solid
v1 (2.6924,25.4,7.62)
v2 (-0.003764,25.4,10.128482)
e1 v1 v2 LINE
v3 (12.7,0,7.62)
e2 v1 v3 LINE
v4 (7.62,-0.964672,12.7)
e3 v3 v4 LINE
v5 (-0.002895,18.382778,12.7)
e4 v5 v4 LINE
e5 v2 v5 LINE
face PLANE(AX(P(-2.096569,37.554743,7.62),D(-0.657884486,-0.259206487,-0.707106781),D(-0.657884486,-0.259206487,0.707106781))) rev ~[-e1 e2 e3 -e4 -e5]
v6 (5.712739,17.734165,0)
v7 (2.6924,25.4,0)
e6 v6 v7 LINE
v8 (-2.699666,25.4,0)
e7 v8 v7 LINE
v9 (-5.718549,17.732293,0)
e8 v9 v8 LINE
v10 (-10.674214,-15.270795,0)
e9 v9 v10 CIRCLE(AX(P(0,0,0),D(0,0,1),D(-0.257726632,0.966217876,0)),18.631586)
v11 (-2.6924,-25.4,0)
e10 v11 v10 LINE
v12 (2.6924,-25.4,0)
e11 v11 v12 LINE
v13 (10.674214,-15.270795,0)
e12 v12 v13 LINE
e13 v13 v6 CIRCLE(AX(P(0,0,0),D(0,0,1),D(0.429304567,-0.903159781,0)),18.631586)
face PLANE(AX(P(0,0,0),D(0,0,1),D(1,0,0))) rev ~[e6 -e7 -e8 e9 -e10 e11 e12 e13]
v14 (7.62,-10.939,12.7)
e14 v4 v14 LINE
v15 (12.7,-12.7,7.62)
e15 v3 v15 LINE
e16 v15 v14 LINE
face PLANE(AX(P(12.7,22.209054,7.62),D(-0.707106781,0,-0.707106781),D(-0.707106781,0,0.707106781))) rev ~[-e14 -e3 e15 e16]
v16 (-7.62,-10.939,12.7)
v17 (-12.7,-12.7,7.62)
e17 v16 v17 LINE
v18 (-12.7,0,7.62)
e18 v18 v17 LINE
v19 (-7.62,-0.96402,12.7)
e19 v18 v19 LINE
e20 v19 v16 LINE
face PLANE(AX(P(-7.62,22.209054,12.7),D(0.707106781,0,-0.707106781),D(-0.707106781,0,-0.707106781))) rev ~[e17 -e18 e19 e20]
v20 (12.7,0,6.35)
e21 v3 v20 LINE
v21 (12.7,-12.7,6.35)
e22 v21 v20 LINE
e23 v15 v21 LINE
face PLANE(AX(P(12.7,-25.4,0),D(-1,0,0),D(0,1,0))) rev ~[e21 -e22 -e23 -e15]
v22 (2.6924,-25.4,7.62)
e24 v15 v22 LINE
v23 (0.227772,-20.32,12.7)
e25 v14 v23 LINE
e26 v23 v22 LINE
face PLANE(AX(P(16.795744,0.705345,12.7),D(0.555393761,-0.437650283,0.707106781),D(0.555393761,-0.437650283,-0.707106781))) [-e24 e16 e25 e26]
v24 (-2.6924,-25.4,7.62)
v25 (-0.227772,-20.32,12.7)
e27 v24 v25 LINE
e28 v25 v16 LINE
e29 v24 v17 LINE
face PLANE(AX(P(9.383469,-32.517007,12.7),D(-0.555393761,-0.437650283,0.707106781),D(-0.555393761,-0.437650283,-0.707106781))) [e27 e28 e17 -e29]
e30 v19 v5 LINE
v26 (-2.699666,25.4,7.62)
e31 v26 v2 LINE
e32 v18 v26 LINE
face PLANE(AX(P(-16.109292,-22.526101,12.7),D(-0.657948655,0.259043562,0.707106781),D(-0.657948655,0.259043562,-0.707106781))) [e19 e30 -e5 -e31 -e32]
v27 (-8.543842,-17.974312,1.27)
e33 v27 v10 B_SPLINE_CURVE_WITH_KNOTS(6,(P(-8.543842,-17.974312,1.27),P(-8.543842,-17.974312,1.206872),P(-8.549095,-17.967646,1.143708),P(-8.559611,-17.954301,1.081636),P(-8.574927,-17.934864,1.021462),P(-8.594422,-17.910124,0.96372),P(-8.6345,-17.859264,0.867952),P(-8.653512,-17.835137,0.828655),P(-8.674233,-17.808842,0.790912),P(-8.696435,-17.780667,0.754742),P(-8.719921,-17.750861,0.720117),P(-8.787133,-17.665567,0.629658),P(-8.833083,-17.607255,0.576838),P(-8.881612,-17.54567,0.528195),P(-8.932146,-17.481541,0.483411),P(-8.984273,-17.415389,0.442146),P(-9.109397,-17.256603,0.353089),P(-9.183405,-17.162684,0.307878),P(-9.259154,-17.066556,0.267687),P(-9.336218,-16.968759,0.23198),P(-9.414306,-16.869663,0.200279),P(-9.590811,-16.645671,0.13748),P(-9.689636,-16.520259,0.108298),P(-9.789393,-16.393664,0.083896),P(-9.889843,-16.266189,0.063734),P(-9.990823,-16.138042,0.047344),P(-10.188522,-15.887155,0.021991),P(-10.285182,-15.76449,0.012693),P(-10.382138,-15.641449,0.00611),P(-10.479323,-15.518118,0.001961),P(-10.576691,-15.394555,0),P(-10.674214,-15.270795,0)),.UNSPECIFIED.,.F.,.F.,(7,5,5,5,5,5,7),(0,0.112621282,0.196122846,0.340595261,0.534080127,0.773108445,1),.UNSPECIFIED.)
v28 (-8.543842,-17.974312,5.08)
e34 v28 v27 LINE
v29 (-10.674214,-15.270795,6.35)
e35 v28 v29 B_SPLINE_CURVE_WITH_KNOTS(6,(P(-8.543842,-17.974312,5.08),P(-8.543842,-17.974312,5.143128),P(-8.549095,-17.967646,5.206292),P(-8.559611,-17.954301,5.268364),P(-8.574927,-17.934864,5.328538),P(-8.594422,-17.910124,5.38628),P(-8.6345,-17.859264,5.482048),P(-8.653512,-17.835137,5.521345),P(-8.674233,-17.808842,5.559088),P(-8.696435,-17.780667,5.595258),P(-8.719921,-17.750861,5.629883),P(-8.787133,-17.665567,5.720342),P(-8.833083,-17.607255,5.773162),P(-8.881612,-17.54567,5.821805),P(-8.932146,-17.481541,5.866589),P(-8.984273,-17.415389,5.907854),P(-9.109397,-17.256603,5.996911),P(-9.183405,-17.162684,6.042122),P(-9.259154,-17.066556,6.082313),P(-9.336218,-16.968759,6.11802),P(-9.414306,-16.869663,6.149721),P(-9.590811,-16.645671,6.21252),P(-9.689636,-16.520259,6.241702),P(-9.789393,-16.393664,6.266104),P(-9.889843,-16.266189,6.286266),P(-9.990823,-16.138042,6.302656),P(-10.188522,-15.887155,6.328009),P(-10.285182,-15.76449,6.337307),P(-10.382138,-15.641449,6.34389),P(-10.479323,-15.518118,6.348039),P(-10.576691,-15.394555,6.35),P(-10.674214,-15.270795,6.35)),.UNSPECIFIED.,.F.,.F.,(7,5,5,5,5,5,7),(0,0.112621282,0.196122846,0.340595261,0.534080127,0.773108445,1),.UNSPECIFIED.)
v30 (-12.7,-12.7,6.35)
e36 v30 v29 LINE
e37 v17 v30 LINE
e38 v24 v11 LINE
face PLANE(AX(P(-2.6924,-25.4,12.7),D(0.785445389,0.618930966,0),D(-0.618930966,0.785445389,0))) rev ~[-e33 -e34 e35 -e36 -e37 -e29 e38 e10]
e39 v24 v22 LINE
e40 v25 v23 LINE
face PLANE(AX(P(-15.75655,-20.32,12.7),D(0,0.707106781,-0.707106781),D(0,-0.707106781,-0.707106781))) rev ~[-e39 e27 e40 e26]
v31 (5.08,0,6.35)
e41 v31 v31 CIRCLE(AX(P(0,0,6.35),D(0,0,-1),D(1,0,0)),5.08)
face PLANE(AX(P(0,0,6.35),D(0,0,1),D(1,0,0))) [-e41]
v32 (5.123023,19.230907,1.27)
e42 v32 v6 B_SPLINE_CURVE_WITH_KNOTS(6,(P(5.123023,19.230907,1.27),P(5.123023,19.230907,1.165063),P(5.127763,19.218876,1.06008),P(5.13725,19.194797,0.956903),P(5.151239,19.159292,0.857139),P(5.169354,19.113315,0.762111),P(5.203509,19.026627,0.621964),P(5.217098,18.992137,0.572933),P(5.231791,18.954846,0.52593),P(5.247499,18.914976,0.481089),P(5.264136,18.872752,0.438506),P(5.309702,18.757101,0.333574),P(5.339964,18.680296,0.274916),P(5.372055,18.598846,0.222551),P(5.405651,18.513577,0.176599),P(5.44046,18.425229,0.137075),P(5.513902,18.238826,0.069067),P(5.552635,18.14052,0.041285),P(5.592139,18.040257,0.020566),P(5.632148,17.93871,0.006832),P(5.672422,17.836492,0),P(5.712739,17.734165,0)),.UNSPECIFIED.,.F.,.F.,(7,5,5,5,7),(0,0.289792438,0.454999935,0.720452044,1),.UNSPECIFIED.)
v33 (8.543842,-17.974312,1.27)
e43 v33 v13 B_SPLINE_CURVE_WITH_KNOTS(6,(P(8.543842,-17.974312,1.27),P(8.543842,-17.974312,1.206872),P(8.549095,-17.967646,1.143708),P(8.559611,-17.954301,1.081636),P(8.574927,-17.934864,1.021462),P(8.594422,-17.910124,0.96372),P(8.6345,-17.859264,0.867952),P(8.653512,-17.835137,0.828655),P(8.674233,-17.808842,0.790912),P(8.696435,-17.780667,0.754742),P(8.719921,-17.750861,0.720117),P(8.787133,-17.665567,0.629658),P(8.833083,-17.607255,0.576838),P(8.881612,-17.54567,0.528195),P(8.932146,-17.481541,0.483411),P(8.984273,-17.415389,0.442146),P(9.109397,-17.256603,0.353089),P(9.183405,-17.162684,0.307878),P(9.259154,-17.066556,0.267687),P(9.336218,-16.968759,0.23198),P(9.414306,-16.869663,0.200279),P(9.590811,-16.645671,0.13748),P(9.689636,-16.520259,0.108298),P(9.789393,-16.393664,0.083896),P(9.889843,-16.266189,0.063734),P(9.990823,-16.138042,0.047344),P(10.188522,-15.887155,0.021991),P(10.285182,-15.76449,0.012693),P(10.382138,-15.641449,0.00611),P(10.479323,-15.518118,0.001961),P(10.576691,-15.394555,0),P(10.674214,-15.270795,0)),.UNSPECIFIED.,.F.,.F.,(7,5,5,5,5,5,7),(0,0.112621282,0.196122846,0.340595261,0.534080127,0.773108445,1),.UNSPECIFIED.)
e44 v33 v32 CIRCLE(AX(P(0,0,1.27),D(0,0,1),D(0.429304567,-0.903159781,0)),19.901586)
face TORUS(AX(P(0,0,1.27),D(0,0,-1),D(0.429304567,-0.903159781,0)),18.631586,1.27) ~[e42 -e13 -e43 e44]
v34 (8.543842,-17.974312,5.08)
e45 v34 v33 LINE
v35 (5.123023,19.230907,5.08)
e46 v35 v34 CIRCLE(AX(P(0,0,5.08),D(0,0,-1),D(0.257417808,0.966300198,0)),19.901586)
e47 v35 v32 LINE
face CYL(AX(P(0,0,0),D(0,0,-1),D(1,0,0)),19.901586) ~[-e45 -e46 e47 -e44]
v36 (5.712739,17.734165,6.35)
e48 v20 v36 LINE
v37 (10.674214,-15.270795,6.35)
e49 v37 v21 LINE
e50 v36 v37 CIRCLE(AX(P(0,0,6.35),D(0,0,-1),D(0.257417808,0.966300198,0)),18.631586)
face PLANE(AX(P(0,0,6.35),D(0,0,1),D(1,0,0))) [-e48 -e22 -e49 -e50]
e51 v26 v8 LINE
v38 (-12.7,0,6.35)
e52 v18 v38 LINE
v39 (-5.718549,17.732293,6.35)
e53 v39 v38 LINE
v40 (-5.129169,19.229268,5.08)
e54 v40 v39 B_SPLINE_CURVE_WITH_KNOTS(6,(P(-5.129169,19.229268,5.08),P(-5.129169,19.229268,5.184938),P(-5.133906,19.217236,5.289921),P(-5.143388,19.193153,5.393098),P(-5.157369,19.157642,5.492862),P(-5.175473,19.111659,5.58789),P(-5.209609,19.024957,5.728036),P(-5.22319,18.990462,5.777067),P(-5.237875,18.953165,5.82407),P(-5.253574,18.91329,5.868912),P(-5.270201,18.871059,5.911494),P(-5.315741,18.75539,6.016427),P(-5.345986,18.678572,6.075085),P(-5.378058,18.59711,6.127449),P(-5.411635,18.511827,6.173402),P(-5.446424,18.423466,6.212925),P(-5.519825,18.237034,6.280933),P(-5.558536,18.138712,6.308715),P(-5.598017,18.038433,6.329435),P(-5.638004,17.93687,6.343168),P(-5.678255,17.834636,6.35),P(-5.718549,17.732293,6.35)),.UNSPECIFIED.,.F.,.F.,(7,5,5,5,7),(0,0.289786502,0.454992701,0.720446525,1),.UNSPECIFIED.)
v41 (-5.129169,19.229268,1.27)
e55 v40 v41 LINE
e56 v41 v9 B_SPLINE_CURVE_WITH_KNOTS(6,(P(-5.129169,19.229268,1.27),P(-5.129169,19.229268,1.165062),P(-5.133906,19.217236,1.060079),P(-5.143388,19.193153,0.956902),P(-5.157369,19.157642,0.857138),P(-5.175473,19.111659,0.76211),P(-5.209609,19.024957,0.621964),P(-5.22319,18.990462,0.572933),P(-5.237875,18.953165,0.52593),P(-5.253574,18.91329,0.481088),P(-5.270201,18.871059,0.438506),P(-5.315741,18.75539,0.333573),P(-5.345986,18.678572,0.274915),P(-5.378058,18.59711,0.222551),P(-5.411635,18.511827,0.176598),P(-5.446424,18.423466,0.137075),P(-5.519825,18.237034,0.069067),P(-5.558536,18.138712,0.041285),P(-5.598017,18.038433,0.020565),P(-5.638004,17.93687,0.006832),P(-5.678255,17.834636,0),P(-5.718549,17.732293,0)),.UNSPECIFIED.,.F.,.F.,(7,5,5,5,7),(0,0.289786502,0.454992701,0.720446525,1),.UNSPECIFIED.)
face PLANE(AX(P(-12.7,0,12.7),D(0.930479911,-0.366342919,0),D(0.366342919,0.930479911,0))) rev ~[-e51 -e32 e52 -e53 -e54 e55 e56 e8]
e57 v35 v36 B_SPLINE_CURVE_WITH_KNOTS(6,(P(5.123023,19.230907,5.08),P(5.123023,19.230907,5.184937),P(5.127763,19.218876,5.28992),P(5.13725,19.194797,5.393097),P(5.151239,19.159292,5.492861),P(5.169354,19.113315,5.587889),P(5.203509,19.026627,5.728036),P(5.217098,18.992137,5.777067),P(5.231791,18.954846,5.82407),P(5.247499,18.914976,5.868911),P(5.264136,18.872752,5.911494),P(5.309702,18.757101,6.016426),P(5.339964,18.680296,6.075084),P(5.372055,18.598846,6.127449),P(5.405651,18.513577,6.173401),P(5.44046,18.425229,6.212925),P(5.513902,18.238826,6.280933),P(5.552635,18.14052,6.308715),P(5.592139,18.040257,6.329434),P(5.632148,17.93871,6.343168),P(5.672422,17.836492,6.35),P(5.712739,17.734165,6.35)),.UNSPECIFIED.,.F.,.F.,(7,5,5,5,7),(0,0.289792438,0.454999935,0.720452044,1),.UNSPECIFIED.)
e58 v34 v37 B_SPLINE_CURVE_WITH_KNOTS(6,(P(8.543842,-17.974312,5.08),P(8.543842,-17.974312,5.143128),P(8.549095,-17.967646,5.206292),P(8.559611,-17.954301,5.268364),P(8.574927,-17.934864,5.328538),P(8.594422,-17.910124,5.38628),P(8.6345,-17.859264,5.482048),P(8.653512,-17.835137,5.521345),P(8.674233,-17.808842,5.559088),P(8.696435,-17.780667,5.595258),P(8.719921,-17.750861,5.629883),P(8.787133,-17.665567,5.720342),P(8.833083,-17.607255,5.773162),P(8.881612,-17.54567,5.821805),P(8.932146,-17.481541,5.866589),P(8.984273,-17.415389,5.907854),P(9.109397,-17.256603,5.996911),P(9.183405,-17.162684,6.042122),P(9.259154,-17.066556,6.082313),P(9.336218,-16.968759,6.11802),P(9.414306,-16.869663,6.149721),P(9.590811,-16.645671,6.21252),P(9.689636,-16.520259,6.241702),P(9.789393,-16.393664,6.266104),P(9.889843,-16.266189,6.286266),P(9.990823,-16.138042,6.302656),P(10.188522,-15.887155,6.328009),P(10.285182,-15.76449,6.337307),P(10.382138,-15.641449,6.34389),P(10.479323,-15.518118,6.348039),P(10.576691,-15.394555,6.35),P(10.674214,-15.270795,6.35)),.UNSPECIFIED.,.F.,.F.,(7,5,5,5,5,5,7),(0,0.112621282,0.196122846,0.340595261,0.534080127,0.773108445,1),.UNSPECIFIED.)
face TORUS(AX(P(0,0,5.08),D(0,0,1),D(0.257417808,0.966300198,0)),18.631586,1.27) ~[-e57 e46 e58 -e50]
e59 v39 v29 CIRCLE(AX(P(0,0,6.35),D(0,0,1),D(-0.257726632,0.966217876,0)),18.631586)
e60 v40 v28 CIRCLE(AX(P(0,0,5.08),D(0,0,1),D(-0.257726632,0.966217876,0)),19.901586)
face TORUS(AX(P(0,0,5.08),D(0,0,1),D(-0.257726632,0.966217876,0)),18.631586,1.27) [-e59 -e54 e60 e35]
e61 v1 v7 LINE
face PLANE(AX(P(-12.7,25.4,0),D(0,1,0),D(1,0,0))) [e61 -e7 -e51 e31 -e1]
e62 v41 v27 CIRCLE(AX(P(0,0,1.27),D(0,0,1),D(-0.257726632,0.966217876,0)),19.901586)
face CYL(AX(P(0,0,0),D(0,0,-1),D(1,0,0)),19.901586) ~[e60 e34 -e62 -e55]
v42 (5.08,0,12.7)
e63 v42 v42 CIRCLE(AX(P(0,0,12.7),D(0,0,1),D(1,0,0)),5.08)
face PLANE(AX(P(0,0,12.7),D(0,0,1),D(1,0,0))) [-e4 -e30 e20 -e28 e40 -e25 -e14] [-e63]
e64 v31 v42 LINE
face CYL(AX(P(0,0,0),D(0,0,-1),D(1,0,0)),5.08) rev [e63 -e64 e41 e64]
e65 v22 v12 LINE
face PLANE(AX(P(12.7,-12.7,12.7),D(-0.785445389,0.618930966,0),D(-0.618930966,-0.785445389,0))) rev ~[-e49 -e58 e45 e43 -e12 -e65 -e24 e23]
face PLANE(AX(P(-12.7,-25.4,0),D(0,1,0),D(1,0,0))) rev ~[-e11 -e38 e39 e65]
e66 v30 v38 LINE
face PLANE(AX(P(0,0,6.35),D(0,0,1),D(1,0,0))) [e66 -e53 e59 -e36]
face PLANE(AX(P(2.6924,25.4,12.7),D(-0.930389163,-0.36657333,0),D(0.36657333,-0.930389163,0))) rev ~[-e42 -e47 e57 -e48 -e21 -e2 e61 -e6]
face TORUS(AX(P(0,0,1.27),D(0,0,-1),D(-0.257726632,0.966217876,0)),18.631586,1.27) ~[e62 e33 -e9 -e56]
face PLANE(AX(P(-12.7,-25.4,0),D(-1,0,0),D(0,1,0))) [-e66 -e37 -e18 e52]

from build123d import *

# Parameters (mm, degrees)
F0_W         = 25.4
F0_H         = 50.8
F0_R         = 5.08
F1_DEPTH     = 12.7
F3_DEPTH     = 25.4
F4_T1_DEPTH  = 47.9732038629
F4_T3_DEPTH  = 31.5130991577
F4_T5_DEPTH  = 42.2974691352
F4_T7_DEPTH  = 42.2974691352
F4_T9_DEPTH  = 62.5709452641
F4_T11_DEPTH = 62.5736078482
F4_T16_DEPTH = 31.520364883
F4_T21_DEPTH = 31.520364883
F5_R         = 19.9015863144
F6_DEPTH     = 6.35
F7_R         = 1.27


# Not quite as in the source:
# - a fillet or chamfer that OpenCascade refuses, or shapes differently, is made with other operations: its cross-section is extruded or revolved along the edge and cut away or added


with BuildPart() as f1:
    # F0 (on Top) → F1 (new body)
    with BuildSketch(Plane.XY):
        Rectangle(F0_W, F0_H)
        Circle(F0_R, mode=Mode.SUBTRACT)
    extrude(amount=F1_DEPTH)

    # F2 (on face) → F3 (cut)
    with BuildSketch(Plane.XY.offset(12.7)):
        Polygon((-12.7, 25.4), (-12.7, 0), (-2.6996657252, 25.4), align=None)
        Polygon((-2.6924, -25.4), (-12.7, -12.7), (-12.7, -25.4), align=None)
        Polygon((12.7, -12.7), (2.6924, -25.4), (12.7, -25.4), align=None)
        Polygon((12.7, 25.4), (2.6924, 25.4), (12.7, 0), align=None)
    extrude(amount=-F3_DEPTH, mode=Mode.SUBTRACT)

    # F4: chamfer of 5.08 on 8 edges, made by hand

    # F4_s2 → F4_t1 (cut)
    with BuildSketch(Plane.XZ.offset(-22.2090542841)):
        Polygon((-7.62, 12.7), (-12.7, 7.62), (-12.7, 12.7), align=None)
        Polygon((12.7, 7.62), (7.62, 12.7), (12.7, 12.7), align=None)
    extrude(amount=F4_T1_DEPTH, mode=Mode.SUBTRACT)

    # F4_s4 → F4_t3 (cut)
    with BuildSketch(Plane.YZ.offset(-15.7565495789)):
        Polygon((-20.32, 12.7), (-25.4, 7.62), (-25.4, 12.7), align=None)
    extrude(amount=F4_T3_DEPTH, mode=Mode.SUBTRACT)

    # F4_s6 → F4_t5 (cut)
    with BuildSketch(Plane(origin=(6.7769328826, 8.6001686327, 0), x_dir=(0, 0, 1), z_dir=(-0.6189309664, -0.7854453888, 0))):
        Polygon((12.7, -12.7555797114), (7.62, -17.8355797114), (12.7, -17.8355797114), align=None)
    extrude(amount=F4_T5_DEPTH, mode=Mode.SUBTRACT)

    # F4_s8 → F4_t7 (cut)
    with BuildSketch(Plane(origin=(19.4022805654, -24.6221834587, 0), x_dir=(0, 0, 1), z_dir=(-0.6189309664, 0.7854453888, 0))):
        Polygon((12.7, -12.7555797114), (7.62, -17.8355797114), (12.7, -17.8355797114), align=None)
    extrude(amount=F4_T7_DEPTH, mode=Mode.SUBTRACT)

    # F4_s10 → F4_t9 (cut)
    with BuildSketch(Plane(origin=(-9.8405603892, -24.994187896, 0), x_dir=(0, 0, 1), z_dir=(0.3663429193, 0.9304799114, 0))):
        Polygon((12.7, -6.7370948746), (7.62, -11.8170948746), (12.7, -11.8170948746), align=None)
    extrude(amount=F4_T9_DEPTH, mode=Mode.SUBTRACT)

    # F4_s12 → F4_t11 (cut)
    with BuildSketch(Plane(origin=(-13.0899935353, 33.2233338458, 0), x_dir=(0, 0, 1), z_dir=(0.36657333, -0.9303891625, 0))):
        Polygon((7.62, -11.8159423639), (12.7, -6.7359423639), (12.7, -11.8159423639), align=None)
    extrude(amount=F4_T11_DEPTH, mode=Mode.SUBTRACT)


with BuildPart() as f4_tool14:
    # F4_s15 → F4_t16 (new body)
    with BuildSketch(Plane.YZ.offset(15.7565495789)):
        Polygon((20.32, 12.7), (25.4, 7.62), (25.4, 12.7), align=None)
    extrude(amount=-F4_T16_DEPTH)

    split(bisect_by=Plane(origin=(9.0414950692, 3.5623490573, 9.7179711819), x_dir=(-0.36657333, 0.9303891625, 0), z_dir=(0.657884486, 0.2592064875, 0.7071067812)), keep=Keep.TOP)


with BuildPart() as f1_1:
    add(f1.part)

    # F4_t13: cut F4_tool14
    add(f4_tool14.part, mode=Mode.SUBTRACT)


with BuildPart() as f4_tool19:
    # F4_s20 → F4_t21 (new body)
    with BuildSketch(Plane.YZ.offset(15.7565495789)):
        Polygon((20.32, 12.7), (25.4, 7.62), (25.4, 12.7), align=None)
    extrude(amount=-F4_T21_DEPTH)

    split(bisect_by=Plane(origin=(-9.0429131582, 3.5603210394, 9.7185474373), x_dir=(-0.3663429193, -0.9304799114, 0), z_dir=(-0.6579486551, 0.2590435625, 0.7071067812)), keep=Keep.TOP)


with BuildPart() as f1_2:
    add(f1_1.part)

    # F4_t18: cut F4_tool19
    add(f4_tool19.part, mode=Mode.SUBTRACT)

    # F5 (on Top) → F6 (join)
    with BuildSketch(Plane.XY):
        Circle(F5_R)
    extrude(amount=F6_DEPTH)

    # F7
    f7_edges = [f1_2.edges().sort_by_distance(p)[0] for p in [
        (19.817994, 1.822158, 0),
        (19.817994, 1.822158, 6.35),
        (-19.818285, 1.818991, 6.35),
        (-19.818285, 1.818991, 0),
    ]]
    fillet(f7_edges, radius=F7_R)


solid = f1_2.part
